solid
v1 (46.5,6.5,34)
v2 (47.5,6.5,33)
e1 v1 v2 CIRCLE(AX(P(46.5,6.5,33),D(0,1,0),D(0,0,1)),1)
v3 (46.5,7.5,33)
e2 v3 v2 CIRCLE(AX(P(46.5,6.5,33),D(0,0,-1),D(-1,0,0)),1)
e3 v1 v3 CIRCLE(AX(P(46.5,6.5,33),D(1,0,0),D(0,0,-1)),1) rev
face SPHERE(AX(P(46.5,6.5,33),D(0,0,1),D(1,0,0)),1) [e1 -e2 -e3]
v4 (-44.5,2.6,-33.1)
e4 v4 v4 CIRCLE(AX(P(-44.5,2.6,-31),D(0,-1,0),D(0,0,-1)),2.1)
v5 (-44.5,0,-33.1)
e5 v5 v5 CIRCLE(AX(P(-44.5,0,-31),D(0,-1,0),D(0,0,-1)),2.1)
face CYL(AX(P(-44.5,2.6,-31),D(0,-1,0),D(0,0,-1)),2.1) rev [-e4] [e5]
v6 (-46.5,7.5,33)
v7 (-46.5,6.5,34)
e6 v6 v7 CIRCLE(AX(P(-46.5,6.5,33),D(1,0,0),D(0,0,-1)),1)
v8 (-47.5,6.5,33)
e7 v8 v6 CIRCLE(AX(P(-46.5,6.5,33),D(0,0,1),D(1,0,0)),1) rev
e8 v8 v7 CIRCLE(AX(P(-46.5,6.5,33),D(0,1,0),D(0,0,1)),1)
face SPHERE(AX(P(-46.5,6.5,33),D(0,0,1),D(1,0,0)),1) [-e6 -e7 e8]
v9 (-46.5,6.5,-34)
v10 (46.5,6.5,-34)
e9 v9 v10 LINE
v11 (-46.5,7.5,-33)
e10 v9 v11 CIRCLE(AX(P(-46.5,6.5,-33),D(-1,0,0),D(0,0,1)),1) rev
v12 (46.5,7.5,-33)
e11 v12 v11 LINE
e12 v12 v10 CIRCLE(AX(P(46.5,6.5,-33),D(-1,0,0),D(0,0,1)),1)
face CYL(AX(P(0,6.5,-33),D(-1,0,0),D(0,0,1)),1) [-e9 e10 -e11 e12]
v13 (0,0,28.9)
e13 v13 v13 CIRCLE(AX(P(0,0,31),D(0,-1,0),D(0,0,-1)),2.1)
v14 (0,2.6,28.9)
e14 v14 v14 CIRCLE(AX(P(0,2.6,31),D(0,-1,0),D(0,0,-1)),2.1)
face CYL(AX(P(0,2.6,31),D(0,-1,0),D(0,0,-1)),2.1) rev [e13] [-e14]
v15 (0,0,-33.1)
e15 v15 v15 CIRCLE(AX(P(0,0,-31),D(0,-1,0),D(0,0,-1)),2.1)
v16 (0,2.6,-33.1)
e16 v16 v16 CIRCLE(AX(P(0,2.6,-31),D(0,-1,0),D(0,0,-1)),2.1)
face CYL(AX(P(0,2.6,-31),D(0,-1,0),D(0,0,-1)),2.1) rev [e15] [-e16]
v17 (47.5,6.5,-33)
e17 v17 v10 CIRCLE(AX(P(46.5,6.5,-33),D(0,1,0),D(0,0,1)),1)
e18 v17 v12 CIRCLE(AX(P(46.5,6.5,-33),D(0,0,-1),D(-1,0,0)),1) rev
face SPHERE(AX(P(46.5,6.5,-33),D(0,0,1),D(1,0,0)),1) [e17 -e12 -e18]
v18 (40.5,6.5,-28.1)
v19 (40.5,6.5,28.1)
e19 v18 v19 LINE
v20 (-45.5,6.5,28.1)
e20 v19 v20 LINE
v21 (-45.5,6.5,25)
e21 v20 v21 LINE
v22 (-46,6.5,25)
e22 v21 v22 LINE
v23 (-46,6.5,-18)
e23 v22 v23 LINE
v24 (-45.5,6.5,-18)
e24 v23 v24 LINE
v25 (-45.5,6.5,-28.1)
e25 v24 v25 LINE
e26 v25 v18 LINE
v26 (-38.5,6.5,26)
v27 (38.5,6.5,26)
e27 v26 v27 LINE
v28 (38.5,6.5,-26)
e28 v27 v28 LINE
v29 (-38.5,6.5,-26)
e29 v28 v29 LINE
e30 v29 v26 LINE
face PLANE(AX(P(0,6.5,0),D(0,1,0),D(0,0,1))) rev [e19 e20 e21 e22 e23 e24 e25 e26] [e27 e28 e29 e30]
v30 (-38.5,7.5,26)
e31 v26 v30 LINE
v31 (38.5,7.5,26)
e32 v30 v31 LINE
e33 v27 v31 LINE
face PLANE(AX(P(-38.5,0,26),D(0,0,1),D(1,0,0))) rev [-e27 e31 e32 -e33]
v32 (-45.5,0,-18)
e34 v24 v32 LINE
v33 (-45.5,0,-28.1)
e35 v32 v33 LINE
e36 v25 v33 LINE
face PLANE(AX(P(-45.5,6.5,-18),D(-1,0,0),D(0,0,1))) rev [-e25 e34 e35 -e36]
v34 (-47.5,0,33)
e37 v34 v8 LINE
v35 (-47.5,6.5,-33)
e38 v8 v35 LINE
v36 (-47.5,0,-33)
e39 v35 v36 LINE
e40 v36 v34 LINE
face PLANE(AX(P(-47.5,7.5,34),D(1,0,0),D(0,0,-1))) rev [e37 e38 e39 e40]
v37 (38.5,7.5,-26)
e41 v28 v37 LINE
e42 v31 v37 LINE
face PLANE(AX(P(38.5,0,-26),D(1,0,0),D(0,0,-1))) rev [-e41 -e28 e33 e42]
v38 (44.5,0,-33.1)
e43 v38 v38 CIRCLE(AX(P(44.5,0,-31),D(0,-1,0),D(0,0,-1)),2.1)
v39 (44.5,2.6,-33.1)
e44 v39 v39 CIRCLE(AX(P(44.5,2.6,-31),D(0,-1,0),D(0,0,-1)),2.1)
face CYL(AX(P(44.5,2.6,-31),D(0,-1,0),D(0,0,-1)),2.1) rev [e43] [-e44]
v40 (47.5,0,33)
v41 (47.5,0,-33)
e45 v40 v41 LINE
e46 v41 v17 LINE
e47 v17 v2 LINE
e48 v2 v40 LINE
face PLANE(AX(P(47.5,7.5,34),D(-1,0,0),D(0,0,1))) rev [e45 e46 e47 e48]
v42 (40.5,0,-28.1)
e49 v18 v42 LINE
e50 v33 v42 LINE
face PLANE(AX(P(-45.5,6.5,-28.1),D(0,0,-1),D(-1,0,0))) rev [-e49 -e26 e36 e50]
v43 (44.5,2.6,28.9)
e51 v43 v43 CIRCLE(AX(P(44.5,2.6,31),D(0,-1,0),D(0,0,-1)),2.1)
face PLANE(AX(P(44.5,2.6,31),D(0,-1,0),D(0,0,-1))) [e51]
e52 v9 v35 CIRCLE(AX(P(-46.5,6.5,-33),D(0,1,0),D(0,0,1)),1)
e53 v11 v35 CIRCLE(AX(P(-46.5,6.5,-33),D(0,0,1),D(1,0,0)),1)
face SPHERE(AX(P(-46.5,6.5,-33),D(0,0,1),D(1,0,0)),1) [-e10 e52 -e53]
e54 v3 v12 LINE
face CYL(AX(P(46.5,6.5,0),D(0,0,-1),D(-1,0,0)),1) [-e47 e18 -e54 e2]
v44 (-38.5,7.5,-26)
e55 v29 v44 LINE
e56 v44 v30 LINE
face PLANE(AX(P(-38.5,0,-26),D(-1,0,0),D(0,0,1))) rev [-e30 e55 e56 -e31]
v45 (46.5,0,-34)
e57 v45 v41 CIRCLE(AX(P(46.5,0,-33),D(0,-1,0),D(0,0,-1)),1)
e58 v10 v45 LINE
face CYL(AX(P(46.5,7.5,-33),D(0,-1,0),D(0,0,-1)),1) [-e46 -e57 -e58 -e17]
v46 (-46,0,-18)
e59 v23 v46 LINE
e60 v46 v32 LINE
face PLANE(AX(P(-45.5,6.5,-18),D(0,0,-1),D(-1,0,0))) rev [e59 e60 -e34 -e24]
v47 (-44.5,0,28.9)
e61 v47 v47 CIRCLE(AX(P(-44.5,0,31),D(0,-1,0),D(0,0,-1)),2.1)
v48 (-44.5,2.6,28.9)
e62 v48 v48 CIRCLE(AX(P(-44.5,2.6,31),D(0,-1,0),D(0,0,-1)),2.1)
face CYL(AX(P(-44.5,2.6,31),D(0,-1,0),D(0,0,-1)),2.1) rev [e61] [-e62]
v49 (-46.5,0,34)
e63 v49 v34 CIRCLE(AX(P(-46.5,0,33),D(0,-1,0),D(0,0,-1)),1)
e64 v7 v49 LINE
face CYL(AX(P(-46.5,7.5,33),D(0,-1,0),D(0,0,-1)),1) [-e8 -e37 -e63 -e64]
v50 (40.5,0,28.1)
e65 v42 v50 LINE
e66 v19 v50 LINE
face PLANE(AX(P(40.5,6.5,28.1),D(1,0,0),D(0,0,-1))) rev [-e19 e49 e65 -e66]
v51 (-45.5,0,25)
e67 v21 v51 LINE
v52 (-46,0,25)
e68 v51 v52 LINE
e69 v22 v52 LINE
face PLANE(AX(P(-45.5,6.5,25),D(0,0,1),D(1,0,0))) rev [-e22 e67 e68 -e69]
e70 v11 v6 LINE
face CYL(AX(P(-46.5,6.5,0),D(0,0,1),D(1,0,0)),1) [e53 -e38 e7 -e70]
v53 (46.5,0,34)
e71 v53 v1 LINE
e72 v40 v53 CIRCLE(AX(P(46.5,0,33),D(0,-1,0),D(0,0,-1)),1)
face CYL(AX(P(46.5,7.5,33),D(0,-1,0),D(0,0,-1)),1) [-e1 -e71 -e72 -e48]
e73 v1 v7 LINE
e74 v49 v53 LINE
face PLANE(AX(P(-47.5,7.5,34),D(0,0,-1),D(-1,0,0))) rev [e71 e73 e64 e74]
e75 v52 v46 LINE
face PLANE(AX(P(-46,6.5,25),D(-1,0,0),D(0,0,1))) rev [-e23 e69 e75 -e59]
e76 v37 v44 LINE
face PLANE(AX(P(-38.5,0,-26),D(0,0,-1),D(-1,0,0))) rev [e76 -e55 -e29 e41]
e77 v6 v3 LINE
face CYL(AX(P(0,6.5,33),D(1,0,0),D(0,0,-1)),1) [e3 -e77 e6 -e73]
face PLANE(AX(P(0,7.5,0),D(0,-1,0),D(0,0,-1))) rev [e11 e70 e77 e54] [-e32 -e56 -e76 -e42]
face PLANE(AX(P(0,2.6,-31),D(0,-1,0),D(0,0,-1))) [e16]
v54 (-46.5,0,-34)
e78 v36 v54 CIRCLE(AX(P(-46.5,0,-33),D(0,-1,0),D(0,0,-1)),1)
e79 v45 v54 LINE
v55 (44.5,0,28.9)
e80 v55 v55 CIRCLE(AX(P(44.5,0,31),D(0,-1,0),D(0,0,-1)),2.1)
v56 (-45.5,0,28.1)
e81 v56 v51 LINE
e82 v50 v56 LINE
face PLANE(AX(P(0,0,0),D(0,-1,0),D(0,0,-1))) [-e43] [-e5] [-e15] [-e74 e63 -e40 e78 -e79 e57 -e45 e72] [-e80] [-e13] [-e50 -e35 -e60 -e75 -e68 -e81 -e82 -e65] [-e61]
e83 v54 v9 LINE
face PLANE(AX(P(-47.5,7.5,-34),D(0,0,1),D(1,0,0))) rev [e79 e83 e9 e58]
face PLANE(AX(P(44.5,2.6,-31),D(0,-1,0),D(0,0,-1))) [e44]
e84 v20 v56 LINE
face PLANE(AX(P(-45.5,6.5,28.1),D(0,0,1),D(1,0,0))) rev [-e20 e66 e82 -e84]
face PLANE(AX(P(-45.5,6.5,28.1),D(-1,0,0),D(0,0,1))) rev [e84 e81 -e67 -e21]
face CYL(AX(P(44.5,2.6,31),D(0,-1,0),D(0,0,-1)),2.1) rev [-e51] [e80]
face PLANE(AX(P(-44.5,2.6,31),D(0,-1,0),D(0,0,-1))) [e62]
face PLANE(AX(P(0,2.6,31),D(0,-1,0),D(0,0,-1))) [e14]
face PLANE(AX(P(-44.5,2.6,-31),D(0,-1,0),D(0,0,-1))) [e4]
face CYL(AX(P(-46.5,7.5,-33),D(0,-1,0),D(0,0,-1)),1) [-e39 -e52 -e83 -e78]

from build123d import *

# Parameters (mm, degrees)
SKETCH_1_W          = 95
SKETCH_1_H          = 68
EXTRUDE_1_DEPTH     = 7.5
CUT_EXTRUDE_1_DEPTH = 6.5
SKETCH_3_W          = 77
SKETCH_3_H          = 52
CUT_EXTRUDE_2_DEPTH = 59.893972527
SKETCH_4_R          = 2.1
CUT_EXTRUDE_3_DEPTH = 2.6
FILLET_1_R          = 1
FILLET_2_R          = 1


with BuildPart() as part:
    # 草图1 → 凸台-拉伸1 (new body)
    with BuildSketch(Plane(origin=(0, 0, 0), x_dir=(1, 0, 0), z_dir=(0, 1, 0))):
        Rectangle(SKETCH_1_W, SKETCH_1_H)
    extrude(amount=EXTRUDE_1_DEPTH)

    # 草图2 → 切除-拉伸1 (cut)
    with BuildSketch(Plane.XZ):
        Polygon((-45.5, 28.1), (40.5, 28.1), (40.5, -28.1), (-45.5, -28.1), (-45.5, -18), (-46, -18), (-46, 25), (-45.5, 25), align=None)
    extrude(amount=-CUT_EXTRUDE_1_DEPTH, mode=Mode.SUBTRACT)

    # 草图3 → 切除-拉伸2 (cut, through all)
    with BuildSketch(Plane(origin=(0, 7.5, 0), x_dir=(1, 0, 0), z_dir=(0, 1, 0))):
        Rectangle(SKETCH_3_W, SKETCH_3_H)
    extrude(amount=-CUT_EXTRUDE_2_DEPTH, mode=Mode.SUBTRACT)

    # 草图4 → 切除-拉伸3 (cut)
    with BuildSketch(Plane.XZ):
        with Locations(Location((-44.5, 31, 0), (0, 0, 270))):
            Circle(SKETCH_4_R)
        with Locations(Location((0, 31, 0), (0, 0, 270))):
            Circle(SKETCH_4_R)
        with Locations(Location((44.5, 31, 0), (0, 0, 270))):
            Circle(SKETCH_4_R)
        with Locations(Location((44.5, -31, 0), (0, 0, 270))):
            Circle(SKETCH_4_R)
        with Locations(Location((0, -31, 0), (0, 0, 270))):
            Circle(SKETCH_4_R)
        with Locations(Location((-44.5, -31, 0), (0, 0, 270))):
            Circle(SKETCH_4_R)
    extrude(amount=-CUT_EXTRUDE_3_DEPTH, mode=Mode.SUBTRACT)

    # 圆角1
    fillet_1_edges = [part.edges().sort_by_distance(p)[0] for p in [
        (-47.5, 7.5, 0),
        (0, 7.5, 34),
        (47.5, 7.5, 0),
        (0, 7.5, -34),
    ]]
    fillet(fillet_1_edges, radius=FILLET_1_R)

    # 圆角2
    # the kernel refuses this fillet: 1 mm, written as the material it takes off along each edge
    with BuildSketch(Plane(origin=(46.5, 6.5, -33), x_dir=(0, 0, -1), z_dir=(1, 0, 0))) as fillet_2_piece_1_section:
        Polygon((0, 0), (FILLET_2_R, 0), (FILLET_2_R, FILLET_2_R), (0, FILLET_2_R), align=None)
    fillet_2_piece_1 = extrude(amount=FILLET_2_R, mode=Mode.PRIVATE)
    fillet_2_piece_1 = fillet_2_piece_1 - Plane(origin=(46.5, 6.5, -33), x_dir=(0, -0.7071067811865475, 0.7071067811865475), z_dir=(1, 0, 0)) * Sphere(FILLET_2_R, mode=Mode.PRIVATE)
    add(fillet_2_piece_1, mode=Mode.SUBTRACT)
    with BuildSketch(Plane(origin=(46.5, 6.5, 33), x_dir=(1, 0, 0), z_dir=(0, 0, 1))) as fillet_2_piece_2_section:
        Polygon((0, 0), (FILLET_2_R, 0), (FILLET_2_R, FILLET_2_R), (0, FILLET_2_R), align=None)
    fillet_2_piece_2 = extrude(amount=FILLET_2_R, mode=Mode.PRIVATE)
    fillet_2_piece_2 = fillet_2_piece_2 - Plane(origin=(46.5, 6.5, 33), x_dir=(-0.7071067811865475, -0.7071067811865475, 0), z_dir=(0, 0, 1)) * Sphere(FILLET_2_R, mode=Mode.PRIVATE)
    add(fillet_2_piece_2, mode=Mode.SUBTRACT)
    with BuildSketch(Plane(origin=(-46.5, 6.5, -33), x_dir=(0, 0, -1), z_dir=(-1, 0, 0))) as fillet_2_piece_3_section:
        Polygon((0, 0), (FILLET_2_R, 0), (FILLET_2_R, -FILLET_2_R), (0, -FILLET_2_R), align=None)
    fillet_2_piece_3 = extrude(amount=FILLET_2_R, mode=Mode.PRIVATE)
    fillet_2_piece_3 = fillet_2_piece_3 - Plane(origin=(-46.5, 6.5, -33), x_dir=(0, -0.7071067811865475, 0.7071067811865475), z_dir=(-1, 0, 0)) * Sphere(FILLET_2_R, mode=Mode.PRIVATE)
    add(fillet_2_piece_3, mode=Mode.SUBTRACT)
    with BuildSketch(Plane(origin=(-46.5, 6.5, 33), x_dir=(-1, 0, 0), z_dir=(0, 0, 1))) as fillet_2_piece_4_section:
        Polygon((0, 0), (FILLET_2_R, 0), (FILLET_2_R, -FILLET_2_R), (0, -FILLET_2_R), align=None)
    fillet_2_piece_4 = extrude(amount=FILLET_2_R, mode=Mode.PRIVATE)
    fillet_2_piece_4 = fillet_2_piece_4 - Plane(origin=(-46.5, 6.5, 33), x_dir=(0.7071067811865475, -0.7071067811865475, 0), z_dir=(0, 0, 1)) * Sphere(FILLET_2_R, mode=Mode.PRIVATE)
    add(fillet_2_piece_4, mode=Mode.SUBTRACT)
    with BuildSketch(Plane(origin=(-47.5, -2.5, 34), x_dir=(1, 0, 0), z_dir=(0, 1, 0)), Plane(origin=(-47.5, -2.5, -34), x_dir=(0, 0, 1), z_dir=(0, 1, 0))) as fillet_2_piece_5:
        with BuildLine():
            CenterArc((FILLET_2_R, FILLET_2_R), FILLET_2_R, 180, 90)
            Line((0, FILLET_2_R), (0, 0))
            Line((0, 0), (FILLET_2_R, 0))
        make_face()
    extrude(amount=9, mode=Mode.SUBTRACT)
    with BuildSketch(Plane(origin=(47.5, -2.5, -34), x_dir=(0, 0, 1), z_dir=(0, 1, 0)), Plane(origin=(47.5, -2.5, 34), x_dir=(-1, 0, 0), z_dir=(0, 1, 0))) as fillet_2_piece_6:
        with BuildLine():
            CenterArc((FILLET_2_R, -FILLET_2_R), FILLET_2_R, 90, 90)
            Line((0, -FILLET_2_R), (0, 0))
            Line((0, 0), (FILLET_2_R, 0))
        make_face()
    extrude(amount=9, mode=Mode.SUBTRACT)


solid = part.part
